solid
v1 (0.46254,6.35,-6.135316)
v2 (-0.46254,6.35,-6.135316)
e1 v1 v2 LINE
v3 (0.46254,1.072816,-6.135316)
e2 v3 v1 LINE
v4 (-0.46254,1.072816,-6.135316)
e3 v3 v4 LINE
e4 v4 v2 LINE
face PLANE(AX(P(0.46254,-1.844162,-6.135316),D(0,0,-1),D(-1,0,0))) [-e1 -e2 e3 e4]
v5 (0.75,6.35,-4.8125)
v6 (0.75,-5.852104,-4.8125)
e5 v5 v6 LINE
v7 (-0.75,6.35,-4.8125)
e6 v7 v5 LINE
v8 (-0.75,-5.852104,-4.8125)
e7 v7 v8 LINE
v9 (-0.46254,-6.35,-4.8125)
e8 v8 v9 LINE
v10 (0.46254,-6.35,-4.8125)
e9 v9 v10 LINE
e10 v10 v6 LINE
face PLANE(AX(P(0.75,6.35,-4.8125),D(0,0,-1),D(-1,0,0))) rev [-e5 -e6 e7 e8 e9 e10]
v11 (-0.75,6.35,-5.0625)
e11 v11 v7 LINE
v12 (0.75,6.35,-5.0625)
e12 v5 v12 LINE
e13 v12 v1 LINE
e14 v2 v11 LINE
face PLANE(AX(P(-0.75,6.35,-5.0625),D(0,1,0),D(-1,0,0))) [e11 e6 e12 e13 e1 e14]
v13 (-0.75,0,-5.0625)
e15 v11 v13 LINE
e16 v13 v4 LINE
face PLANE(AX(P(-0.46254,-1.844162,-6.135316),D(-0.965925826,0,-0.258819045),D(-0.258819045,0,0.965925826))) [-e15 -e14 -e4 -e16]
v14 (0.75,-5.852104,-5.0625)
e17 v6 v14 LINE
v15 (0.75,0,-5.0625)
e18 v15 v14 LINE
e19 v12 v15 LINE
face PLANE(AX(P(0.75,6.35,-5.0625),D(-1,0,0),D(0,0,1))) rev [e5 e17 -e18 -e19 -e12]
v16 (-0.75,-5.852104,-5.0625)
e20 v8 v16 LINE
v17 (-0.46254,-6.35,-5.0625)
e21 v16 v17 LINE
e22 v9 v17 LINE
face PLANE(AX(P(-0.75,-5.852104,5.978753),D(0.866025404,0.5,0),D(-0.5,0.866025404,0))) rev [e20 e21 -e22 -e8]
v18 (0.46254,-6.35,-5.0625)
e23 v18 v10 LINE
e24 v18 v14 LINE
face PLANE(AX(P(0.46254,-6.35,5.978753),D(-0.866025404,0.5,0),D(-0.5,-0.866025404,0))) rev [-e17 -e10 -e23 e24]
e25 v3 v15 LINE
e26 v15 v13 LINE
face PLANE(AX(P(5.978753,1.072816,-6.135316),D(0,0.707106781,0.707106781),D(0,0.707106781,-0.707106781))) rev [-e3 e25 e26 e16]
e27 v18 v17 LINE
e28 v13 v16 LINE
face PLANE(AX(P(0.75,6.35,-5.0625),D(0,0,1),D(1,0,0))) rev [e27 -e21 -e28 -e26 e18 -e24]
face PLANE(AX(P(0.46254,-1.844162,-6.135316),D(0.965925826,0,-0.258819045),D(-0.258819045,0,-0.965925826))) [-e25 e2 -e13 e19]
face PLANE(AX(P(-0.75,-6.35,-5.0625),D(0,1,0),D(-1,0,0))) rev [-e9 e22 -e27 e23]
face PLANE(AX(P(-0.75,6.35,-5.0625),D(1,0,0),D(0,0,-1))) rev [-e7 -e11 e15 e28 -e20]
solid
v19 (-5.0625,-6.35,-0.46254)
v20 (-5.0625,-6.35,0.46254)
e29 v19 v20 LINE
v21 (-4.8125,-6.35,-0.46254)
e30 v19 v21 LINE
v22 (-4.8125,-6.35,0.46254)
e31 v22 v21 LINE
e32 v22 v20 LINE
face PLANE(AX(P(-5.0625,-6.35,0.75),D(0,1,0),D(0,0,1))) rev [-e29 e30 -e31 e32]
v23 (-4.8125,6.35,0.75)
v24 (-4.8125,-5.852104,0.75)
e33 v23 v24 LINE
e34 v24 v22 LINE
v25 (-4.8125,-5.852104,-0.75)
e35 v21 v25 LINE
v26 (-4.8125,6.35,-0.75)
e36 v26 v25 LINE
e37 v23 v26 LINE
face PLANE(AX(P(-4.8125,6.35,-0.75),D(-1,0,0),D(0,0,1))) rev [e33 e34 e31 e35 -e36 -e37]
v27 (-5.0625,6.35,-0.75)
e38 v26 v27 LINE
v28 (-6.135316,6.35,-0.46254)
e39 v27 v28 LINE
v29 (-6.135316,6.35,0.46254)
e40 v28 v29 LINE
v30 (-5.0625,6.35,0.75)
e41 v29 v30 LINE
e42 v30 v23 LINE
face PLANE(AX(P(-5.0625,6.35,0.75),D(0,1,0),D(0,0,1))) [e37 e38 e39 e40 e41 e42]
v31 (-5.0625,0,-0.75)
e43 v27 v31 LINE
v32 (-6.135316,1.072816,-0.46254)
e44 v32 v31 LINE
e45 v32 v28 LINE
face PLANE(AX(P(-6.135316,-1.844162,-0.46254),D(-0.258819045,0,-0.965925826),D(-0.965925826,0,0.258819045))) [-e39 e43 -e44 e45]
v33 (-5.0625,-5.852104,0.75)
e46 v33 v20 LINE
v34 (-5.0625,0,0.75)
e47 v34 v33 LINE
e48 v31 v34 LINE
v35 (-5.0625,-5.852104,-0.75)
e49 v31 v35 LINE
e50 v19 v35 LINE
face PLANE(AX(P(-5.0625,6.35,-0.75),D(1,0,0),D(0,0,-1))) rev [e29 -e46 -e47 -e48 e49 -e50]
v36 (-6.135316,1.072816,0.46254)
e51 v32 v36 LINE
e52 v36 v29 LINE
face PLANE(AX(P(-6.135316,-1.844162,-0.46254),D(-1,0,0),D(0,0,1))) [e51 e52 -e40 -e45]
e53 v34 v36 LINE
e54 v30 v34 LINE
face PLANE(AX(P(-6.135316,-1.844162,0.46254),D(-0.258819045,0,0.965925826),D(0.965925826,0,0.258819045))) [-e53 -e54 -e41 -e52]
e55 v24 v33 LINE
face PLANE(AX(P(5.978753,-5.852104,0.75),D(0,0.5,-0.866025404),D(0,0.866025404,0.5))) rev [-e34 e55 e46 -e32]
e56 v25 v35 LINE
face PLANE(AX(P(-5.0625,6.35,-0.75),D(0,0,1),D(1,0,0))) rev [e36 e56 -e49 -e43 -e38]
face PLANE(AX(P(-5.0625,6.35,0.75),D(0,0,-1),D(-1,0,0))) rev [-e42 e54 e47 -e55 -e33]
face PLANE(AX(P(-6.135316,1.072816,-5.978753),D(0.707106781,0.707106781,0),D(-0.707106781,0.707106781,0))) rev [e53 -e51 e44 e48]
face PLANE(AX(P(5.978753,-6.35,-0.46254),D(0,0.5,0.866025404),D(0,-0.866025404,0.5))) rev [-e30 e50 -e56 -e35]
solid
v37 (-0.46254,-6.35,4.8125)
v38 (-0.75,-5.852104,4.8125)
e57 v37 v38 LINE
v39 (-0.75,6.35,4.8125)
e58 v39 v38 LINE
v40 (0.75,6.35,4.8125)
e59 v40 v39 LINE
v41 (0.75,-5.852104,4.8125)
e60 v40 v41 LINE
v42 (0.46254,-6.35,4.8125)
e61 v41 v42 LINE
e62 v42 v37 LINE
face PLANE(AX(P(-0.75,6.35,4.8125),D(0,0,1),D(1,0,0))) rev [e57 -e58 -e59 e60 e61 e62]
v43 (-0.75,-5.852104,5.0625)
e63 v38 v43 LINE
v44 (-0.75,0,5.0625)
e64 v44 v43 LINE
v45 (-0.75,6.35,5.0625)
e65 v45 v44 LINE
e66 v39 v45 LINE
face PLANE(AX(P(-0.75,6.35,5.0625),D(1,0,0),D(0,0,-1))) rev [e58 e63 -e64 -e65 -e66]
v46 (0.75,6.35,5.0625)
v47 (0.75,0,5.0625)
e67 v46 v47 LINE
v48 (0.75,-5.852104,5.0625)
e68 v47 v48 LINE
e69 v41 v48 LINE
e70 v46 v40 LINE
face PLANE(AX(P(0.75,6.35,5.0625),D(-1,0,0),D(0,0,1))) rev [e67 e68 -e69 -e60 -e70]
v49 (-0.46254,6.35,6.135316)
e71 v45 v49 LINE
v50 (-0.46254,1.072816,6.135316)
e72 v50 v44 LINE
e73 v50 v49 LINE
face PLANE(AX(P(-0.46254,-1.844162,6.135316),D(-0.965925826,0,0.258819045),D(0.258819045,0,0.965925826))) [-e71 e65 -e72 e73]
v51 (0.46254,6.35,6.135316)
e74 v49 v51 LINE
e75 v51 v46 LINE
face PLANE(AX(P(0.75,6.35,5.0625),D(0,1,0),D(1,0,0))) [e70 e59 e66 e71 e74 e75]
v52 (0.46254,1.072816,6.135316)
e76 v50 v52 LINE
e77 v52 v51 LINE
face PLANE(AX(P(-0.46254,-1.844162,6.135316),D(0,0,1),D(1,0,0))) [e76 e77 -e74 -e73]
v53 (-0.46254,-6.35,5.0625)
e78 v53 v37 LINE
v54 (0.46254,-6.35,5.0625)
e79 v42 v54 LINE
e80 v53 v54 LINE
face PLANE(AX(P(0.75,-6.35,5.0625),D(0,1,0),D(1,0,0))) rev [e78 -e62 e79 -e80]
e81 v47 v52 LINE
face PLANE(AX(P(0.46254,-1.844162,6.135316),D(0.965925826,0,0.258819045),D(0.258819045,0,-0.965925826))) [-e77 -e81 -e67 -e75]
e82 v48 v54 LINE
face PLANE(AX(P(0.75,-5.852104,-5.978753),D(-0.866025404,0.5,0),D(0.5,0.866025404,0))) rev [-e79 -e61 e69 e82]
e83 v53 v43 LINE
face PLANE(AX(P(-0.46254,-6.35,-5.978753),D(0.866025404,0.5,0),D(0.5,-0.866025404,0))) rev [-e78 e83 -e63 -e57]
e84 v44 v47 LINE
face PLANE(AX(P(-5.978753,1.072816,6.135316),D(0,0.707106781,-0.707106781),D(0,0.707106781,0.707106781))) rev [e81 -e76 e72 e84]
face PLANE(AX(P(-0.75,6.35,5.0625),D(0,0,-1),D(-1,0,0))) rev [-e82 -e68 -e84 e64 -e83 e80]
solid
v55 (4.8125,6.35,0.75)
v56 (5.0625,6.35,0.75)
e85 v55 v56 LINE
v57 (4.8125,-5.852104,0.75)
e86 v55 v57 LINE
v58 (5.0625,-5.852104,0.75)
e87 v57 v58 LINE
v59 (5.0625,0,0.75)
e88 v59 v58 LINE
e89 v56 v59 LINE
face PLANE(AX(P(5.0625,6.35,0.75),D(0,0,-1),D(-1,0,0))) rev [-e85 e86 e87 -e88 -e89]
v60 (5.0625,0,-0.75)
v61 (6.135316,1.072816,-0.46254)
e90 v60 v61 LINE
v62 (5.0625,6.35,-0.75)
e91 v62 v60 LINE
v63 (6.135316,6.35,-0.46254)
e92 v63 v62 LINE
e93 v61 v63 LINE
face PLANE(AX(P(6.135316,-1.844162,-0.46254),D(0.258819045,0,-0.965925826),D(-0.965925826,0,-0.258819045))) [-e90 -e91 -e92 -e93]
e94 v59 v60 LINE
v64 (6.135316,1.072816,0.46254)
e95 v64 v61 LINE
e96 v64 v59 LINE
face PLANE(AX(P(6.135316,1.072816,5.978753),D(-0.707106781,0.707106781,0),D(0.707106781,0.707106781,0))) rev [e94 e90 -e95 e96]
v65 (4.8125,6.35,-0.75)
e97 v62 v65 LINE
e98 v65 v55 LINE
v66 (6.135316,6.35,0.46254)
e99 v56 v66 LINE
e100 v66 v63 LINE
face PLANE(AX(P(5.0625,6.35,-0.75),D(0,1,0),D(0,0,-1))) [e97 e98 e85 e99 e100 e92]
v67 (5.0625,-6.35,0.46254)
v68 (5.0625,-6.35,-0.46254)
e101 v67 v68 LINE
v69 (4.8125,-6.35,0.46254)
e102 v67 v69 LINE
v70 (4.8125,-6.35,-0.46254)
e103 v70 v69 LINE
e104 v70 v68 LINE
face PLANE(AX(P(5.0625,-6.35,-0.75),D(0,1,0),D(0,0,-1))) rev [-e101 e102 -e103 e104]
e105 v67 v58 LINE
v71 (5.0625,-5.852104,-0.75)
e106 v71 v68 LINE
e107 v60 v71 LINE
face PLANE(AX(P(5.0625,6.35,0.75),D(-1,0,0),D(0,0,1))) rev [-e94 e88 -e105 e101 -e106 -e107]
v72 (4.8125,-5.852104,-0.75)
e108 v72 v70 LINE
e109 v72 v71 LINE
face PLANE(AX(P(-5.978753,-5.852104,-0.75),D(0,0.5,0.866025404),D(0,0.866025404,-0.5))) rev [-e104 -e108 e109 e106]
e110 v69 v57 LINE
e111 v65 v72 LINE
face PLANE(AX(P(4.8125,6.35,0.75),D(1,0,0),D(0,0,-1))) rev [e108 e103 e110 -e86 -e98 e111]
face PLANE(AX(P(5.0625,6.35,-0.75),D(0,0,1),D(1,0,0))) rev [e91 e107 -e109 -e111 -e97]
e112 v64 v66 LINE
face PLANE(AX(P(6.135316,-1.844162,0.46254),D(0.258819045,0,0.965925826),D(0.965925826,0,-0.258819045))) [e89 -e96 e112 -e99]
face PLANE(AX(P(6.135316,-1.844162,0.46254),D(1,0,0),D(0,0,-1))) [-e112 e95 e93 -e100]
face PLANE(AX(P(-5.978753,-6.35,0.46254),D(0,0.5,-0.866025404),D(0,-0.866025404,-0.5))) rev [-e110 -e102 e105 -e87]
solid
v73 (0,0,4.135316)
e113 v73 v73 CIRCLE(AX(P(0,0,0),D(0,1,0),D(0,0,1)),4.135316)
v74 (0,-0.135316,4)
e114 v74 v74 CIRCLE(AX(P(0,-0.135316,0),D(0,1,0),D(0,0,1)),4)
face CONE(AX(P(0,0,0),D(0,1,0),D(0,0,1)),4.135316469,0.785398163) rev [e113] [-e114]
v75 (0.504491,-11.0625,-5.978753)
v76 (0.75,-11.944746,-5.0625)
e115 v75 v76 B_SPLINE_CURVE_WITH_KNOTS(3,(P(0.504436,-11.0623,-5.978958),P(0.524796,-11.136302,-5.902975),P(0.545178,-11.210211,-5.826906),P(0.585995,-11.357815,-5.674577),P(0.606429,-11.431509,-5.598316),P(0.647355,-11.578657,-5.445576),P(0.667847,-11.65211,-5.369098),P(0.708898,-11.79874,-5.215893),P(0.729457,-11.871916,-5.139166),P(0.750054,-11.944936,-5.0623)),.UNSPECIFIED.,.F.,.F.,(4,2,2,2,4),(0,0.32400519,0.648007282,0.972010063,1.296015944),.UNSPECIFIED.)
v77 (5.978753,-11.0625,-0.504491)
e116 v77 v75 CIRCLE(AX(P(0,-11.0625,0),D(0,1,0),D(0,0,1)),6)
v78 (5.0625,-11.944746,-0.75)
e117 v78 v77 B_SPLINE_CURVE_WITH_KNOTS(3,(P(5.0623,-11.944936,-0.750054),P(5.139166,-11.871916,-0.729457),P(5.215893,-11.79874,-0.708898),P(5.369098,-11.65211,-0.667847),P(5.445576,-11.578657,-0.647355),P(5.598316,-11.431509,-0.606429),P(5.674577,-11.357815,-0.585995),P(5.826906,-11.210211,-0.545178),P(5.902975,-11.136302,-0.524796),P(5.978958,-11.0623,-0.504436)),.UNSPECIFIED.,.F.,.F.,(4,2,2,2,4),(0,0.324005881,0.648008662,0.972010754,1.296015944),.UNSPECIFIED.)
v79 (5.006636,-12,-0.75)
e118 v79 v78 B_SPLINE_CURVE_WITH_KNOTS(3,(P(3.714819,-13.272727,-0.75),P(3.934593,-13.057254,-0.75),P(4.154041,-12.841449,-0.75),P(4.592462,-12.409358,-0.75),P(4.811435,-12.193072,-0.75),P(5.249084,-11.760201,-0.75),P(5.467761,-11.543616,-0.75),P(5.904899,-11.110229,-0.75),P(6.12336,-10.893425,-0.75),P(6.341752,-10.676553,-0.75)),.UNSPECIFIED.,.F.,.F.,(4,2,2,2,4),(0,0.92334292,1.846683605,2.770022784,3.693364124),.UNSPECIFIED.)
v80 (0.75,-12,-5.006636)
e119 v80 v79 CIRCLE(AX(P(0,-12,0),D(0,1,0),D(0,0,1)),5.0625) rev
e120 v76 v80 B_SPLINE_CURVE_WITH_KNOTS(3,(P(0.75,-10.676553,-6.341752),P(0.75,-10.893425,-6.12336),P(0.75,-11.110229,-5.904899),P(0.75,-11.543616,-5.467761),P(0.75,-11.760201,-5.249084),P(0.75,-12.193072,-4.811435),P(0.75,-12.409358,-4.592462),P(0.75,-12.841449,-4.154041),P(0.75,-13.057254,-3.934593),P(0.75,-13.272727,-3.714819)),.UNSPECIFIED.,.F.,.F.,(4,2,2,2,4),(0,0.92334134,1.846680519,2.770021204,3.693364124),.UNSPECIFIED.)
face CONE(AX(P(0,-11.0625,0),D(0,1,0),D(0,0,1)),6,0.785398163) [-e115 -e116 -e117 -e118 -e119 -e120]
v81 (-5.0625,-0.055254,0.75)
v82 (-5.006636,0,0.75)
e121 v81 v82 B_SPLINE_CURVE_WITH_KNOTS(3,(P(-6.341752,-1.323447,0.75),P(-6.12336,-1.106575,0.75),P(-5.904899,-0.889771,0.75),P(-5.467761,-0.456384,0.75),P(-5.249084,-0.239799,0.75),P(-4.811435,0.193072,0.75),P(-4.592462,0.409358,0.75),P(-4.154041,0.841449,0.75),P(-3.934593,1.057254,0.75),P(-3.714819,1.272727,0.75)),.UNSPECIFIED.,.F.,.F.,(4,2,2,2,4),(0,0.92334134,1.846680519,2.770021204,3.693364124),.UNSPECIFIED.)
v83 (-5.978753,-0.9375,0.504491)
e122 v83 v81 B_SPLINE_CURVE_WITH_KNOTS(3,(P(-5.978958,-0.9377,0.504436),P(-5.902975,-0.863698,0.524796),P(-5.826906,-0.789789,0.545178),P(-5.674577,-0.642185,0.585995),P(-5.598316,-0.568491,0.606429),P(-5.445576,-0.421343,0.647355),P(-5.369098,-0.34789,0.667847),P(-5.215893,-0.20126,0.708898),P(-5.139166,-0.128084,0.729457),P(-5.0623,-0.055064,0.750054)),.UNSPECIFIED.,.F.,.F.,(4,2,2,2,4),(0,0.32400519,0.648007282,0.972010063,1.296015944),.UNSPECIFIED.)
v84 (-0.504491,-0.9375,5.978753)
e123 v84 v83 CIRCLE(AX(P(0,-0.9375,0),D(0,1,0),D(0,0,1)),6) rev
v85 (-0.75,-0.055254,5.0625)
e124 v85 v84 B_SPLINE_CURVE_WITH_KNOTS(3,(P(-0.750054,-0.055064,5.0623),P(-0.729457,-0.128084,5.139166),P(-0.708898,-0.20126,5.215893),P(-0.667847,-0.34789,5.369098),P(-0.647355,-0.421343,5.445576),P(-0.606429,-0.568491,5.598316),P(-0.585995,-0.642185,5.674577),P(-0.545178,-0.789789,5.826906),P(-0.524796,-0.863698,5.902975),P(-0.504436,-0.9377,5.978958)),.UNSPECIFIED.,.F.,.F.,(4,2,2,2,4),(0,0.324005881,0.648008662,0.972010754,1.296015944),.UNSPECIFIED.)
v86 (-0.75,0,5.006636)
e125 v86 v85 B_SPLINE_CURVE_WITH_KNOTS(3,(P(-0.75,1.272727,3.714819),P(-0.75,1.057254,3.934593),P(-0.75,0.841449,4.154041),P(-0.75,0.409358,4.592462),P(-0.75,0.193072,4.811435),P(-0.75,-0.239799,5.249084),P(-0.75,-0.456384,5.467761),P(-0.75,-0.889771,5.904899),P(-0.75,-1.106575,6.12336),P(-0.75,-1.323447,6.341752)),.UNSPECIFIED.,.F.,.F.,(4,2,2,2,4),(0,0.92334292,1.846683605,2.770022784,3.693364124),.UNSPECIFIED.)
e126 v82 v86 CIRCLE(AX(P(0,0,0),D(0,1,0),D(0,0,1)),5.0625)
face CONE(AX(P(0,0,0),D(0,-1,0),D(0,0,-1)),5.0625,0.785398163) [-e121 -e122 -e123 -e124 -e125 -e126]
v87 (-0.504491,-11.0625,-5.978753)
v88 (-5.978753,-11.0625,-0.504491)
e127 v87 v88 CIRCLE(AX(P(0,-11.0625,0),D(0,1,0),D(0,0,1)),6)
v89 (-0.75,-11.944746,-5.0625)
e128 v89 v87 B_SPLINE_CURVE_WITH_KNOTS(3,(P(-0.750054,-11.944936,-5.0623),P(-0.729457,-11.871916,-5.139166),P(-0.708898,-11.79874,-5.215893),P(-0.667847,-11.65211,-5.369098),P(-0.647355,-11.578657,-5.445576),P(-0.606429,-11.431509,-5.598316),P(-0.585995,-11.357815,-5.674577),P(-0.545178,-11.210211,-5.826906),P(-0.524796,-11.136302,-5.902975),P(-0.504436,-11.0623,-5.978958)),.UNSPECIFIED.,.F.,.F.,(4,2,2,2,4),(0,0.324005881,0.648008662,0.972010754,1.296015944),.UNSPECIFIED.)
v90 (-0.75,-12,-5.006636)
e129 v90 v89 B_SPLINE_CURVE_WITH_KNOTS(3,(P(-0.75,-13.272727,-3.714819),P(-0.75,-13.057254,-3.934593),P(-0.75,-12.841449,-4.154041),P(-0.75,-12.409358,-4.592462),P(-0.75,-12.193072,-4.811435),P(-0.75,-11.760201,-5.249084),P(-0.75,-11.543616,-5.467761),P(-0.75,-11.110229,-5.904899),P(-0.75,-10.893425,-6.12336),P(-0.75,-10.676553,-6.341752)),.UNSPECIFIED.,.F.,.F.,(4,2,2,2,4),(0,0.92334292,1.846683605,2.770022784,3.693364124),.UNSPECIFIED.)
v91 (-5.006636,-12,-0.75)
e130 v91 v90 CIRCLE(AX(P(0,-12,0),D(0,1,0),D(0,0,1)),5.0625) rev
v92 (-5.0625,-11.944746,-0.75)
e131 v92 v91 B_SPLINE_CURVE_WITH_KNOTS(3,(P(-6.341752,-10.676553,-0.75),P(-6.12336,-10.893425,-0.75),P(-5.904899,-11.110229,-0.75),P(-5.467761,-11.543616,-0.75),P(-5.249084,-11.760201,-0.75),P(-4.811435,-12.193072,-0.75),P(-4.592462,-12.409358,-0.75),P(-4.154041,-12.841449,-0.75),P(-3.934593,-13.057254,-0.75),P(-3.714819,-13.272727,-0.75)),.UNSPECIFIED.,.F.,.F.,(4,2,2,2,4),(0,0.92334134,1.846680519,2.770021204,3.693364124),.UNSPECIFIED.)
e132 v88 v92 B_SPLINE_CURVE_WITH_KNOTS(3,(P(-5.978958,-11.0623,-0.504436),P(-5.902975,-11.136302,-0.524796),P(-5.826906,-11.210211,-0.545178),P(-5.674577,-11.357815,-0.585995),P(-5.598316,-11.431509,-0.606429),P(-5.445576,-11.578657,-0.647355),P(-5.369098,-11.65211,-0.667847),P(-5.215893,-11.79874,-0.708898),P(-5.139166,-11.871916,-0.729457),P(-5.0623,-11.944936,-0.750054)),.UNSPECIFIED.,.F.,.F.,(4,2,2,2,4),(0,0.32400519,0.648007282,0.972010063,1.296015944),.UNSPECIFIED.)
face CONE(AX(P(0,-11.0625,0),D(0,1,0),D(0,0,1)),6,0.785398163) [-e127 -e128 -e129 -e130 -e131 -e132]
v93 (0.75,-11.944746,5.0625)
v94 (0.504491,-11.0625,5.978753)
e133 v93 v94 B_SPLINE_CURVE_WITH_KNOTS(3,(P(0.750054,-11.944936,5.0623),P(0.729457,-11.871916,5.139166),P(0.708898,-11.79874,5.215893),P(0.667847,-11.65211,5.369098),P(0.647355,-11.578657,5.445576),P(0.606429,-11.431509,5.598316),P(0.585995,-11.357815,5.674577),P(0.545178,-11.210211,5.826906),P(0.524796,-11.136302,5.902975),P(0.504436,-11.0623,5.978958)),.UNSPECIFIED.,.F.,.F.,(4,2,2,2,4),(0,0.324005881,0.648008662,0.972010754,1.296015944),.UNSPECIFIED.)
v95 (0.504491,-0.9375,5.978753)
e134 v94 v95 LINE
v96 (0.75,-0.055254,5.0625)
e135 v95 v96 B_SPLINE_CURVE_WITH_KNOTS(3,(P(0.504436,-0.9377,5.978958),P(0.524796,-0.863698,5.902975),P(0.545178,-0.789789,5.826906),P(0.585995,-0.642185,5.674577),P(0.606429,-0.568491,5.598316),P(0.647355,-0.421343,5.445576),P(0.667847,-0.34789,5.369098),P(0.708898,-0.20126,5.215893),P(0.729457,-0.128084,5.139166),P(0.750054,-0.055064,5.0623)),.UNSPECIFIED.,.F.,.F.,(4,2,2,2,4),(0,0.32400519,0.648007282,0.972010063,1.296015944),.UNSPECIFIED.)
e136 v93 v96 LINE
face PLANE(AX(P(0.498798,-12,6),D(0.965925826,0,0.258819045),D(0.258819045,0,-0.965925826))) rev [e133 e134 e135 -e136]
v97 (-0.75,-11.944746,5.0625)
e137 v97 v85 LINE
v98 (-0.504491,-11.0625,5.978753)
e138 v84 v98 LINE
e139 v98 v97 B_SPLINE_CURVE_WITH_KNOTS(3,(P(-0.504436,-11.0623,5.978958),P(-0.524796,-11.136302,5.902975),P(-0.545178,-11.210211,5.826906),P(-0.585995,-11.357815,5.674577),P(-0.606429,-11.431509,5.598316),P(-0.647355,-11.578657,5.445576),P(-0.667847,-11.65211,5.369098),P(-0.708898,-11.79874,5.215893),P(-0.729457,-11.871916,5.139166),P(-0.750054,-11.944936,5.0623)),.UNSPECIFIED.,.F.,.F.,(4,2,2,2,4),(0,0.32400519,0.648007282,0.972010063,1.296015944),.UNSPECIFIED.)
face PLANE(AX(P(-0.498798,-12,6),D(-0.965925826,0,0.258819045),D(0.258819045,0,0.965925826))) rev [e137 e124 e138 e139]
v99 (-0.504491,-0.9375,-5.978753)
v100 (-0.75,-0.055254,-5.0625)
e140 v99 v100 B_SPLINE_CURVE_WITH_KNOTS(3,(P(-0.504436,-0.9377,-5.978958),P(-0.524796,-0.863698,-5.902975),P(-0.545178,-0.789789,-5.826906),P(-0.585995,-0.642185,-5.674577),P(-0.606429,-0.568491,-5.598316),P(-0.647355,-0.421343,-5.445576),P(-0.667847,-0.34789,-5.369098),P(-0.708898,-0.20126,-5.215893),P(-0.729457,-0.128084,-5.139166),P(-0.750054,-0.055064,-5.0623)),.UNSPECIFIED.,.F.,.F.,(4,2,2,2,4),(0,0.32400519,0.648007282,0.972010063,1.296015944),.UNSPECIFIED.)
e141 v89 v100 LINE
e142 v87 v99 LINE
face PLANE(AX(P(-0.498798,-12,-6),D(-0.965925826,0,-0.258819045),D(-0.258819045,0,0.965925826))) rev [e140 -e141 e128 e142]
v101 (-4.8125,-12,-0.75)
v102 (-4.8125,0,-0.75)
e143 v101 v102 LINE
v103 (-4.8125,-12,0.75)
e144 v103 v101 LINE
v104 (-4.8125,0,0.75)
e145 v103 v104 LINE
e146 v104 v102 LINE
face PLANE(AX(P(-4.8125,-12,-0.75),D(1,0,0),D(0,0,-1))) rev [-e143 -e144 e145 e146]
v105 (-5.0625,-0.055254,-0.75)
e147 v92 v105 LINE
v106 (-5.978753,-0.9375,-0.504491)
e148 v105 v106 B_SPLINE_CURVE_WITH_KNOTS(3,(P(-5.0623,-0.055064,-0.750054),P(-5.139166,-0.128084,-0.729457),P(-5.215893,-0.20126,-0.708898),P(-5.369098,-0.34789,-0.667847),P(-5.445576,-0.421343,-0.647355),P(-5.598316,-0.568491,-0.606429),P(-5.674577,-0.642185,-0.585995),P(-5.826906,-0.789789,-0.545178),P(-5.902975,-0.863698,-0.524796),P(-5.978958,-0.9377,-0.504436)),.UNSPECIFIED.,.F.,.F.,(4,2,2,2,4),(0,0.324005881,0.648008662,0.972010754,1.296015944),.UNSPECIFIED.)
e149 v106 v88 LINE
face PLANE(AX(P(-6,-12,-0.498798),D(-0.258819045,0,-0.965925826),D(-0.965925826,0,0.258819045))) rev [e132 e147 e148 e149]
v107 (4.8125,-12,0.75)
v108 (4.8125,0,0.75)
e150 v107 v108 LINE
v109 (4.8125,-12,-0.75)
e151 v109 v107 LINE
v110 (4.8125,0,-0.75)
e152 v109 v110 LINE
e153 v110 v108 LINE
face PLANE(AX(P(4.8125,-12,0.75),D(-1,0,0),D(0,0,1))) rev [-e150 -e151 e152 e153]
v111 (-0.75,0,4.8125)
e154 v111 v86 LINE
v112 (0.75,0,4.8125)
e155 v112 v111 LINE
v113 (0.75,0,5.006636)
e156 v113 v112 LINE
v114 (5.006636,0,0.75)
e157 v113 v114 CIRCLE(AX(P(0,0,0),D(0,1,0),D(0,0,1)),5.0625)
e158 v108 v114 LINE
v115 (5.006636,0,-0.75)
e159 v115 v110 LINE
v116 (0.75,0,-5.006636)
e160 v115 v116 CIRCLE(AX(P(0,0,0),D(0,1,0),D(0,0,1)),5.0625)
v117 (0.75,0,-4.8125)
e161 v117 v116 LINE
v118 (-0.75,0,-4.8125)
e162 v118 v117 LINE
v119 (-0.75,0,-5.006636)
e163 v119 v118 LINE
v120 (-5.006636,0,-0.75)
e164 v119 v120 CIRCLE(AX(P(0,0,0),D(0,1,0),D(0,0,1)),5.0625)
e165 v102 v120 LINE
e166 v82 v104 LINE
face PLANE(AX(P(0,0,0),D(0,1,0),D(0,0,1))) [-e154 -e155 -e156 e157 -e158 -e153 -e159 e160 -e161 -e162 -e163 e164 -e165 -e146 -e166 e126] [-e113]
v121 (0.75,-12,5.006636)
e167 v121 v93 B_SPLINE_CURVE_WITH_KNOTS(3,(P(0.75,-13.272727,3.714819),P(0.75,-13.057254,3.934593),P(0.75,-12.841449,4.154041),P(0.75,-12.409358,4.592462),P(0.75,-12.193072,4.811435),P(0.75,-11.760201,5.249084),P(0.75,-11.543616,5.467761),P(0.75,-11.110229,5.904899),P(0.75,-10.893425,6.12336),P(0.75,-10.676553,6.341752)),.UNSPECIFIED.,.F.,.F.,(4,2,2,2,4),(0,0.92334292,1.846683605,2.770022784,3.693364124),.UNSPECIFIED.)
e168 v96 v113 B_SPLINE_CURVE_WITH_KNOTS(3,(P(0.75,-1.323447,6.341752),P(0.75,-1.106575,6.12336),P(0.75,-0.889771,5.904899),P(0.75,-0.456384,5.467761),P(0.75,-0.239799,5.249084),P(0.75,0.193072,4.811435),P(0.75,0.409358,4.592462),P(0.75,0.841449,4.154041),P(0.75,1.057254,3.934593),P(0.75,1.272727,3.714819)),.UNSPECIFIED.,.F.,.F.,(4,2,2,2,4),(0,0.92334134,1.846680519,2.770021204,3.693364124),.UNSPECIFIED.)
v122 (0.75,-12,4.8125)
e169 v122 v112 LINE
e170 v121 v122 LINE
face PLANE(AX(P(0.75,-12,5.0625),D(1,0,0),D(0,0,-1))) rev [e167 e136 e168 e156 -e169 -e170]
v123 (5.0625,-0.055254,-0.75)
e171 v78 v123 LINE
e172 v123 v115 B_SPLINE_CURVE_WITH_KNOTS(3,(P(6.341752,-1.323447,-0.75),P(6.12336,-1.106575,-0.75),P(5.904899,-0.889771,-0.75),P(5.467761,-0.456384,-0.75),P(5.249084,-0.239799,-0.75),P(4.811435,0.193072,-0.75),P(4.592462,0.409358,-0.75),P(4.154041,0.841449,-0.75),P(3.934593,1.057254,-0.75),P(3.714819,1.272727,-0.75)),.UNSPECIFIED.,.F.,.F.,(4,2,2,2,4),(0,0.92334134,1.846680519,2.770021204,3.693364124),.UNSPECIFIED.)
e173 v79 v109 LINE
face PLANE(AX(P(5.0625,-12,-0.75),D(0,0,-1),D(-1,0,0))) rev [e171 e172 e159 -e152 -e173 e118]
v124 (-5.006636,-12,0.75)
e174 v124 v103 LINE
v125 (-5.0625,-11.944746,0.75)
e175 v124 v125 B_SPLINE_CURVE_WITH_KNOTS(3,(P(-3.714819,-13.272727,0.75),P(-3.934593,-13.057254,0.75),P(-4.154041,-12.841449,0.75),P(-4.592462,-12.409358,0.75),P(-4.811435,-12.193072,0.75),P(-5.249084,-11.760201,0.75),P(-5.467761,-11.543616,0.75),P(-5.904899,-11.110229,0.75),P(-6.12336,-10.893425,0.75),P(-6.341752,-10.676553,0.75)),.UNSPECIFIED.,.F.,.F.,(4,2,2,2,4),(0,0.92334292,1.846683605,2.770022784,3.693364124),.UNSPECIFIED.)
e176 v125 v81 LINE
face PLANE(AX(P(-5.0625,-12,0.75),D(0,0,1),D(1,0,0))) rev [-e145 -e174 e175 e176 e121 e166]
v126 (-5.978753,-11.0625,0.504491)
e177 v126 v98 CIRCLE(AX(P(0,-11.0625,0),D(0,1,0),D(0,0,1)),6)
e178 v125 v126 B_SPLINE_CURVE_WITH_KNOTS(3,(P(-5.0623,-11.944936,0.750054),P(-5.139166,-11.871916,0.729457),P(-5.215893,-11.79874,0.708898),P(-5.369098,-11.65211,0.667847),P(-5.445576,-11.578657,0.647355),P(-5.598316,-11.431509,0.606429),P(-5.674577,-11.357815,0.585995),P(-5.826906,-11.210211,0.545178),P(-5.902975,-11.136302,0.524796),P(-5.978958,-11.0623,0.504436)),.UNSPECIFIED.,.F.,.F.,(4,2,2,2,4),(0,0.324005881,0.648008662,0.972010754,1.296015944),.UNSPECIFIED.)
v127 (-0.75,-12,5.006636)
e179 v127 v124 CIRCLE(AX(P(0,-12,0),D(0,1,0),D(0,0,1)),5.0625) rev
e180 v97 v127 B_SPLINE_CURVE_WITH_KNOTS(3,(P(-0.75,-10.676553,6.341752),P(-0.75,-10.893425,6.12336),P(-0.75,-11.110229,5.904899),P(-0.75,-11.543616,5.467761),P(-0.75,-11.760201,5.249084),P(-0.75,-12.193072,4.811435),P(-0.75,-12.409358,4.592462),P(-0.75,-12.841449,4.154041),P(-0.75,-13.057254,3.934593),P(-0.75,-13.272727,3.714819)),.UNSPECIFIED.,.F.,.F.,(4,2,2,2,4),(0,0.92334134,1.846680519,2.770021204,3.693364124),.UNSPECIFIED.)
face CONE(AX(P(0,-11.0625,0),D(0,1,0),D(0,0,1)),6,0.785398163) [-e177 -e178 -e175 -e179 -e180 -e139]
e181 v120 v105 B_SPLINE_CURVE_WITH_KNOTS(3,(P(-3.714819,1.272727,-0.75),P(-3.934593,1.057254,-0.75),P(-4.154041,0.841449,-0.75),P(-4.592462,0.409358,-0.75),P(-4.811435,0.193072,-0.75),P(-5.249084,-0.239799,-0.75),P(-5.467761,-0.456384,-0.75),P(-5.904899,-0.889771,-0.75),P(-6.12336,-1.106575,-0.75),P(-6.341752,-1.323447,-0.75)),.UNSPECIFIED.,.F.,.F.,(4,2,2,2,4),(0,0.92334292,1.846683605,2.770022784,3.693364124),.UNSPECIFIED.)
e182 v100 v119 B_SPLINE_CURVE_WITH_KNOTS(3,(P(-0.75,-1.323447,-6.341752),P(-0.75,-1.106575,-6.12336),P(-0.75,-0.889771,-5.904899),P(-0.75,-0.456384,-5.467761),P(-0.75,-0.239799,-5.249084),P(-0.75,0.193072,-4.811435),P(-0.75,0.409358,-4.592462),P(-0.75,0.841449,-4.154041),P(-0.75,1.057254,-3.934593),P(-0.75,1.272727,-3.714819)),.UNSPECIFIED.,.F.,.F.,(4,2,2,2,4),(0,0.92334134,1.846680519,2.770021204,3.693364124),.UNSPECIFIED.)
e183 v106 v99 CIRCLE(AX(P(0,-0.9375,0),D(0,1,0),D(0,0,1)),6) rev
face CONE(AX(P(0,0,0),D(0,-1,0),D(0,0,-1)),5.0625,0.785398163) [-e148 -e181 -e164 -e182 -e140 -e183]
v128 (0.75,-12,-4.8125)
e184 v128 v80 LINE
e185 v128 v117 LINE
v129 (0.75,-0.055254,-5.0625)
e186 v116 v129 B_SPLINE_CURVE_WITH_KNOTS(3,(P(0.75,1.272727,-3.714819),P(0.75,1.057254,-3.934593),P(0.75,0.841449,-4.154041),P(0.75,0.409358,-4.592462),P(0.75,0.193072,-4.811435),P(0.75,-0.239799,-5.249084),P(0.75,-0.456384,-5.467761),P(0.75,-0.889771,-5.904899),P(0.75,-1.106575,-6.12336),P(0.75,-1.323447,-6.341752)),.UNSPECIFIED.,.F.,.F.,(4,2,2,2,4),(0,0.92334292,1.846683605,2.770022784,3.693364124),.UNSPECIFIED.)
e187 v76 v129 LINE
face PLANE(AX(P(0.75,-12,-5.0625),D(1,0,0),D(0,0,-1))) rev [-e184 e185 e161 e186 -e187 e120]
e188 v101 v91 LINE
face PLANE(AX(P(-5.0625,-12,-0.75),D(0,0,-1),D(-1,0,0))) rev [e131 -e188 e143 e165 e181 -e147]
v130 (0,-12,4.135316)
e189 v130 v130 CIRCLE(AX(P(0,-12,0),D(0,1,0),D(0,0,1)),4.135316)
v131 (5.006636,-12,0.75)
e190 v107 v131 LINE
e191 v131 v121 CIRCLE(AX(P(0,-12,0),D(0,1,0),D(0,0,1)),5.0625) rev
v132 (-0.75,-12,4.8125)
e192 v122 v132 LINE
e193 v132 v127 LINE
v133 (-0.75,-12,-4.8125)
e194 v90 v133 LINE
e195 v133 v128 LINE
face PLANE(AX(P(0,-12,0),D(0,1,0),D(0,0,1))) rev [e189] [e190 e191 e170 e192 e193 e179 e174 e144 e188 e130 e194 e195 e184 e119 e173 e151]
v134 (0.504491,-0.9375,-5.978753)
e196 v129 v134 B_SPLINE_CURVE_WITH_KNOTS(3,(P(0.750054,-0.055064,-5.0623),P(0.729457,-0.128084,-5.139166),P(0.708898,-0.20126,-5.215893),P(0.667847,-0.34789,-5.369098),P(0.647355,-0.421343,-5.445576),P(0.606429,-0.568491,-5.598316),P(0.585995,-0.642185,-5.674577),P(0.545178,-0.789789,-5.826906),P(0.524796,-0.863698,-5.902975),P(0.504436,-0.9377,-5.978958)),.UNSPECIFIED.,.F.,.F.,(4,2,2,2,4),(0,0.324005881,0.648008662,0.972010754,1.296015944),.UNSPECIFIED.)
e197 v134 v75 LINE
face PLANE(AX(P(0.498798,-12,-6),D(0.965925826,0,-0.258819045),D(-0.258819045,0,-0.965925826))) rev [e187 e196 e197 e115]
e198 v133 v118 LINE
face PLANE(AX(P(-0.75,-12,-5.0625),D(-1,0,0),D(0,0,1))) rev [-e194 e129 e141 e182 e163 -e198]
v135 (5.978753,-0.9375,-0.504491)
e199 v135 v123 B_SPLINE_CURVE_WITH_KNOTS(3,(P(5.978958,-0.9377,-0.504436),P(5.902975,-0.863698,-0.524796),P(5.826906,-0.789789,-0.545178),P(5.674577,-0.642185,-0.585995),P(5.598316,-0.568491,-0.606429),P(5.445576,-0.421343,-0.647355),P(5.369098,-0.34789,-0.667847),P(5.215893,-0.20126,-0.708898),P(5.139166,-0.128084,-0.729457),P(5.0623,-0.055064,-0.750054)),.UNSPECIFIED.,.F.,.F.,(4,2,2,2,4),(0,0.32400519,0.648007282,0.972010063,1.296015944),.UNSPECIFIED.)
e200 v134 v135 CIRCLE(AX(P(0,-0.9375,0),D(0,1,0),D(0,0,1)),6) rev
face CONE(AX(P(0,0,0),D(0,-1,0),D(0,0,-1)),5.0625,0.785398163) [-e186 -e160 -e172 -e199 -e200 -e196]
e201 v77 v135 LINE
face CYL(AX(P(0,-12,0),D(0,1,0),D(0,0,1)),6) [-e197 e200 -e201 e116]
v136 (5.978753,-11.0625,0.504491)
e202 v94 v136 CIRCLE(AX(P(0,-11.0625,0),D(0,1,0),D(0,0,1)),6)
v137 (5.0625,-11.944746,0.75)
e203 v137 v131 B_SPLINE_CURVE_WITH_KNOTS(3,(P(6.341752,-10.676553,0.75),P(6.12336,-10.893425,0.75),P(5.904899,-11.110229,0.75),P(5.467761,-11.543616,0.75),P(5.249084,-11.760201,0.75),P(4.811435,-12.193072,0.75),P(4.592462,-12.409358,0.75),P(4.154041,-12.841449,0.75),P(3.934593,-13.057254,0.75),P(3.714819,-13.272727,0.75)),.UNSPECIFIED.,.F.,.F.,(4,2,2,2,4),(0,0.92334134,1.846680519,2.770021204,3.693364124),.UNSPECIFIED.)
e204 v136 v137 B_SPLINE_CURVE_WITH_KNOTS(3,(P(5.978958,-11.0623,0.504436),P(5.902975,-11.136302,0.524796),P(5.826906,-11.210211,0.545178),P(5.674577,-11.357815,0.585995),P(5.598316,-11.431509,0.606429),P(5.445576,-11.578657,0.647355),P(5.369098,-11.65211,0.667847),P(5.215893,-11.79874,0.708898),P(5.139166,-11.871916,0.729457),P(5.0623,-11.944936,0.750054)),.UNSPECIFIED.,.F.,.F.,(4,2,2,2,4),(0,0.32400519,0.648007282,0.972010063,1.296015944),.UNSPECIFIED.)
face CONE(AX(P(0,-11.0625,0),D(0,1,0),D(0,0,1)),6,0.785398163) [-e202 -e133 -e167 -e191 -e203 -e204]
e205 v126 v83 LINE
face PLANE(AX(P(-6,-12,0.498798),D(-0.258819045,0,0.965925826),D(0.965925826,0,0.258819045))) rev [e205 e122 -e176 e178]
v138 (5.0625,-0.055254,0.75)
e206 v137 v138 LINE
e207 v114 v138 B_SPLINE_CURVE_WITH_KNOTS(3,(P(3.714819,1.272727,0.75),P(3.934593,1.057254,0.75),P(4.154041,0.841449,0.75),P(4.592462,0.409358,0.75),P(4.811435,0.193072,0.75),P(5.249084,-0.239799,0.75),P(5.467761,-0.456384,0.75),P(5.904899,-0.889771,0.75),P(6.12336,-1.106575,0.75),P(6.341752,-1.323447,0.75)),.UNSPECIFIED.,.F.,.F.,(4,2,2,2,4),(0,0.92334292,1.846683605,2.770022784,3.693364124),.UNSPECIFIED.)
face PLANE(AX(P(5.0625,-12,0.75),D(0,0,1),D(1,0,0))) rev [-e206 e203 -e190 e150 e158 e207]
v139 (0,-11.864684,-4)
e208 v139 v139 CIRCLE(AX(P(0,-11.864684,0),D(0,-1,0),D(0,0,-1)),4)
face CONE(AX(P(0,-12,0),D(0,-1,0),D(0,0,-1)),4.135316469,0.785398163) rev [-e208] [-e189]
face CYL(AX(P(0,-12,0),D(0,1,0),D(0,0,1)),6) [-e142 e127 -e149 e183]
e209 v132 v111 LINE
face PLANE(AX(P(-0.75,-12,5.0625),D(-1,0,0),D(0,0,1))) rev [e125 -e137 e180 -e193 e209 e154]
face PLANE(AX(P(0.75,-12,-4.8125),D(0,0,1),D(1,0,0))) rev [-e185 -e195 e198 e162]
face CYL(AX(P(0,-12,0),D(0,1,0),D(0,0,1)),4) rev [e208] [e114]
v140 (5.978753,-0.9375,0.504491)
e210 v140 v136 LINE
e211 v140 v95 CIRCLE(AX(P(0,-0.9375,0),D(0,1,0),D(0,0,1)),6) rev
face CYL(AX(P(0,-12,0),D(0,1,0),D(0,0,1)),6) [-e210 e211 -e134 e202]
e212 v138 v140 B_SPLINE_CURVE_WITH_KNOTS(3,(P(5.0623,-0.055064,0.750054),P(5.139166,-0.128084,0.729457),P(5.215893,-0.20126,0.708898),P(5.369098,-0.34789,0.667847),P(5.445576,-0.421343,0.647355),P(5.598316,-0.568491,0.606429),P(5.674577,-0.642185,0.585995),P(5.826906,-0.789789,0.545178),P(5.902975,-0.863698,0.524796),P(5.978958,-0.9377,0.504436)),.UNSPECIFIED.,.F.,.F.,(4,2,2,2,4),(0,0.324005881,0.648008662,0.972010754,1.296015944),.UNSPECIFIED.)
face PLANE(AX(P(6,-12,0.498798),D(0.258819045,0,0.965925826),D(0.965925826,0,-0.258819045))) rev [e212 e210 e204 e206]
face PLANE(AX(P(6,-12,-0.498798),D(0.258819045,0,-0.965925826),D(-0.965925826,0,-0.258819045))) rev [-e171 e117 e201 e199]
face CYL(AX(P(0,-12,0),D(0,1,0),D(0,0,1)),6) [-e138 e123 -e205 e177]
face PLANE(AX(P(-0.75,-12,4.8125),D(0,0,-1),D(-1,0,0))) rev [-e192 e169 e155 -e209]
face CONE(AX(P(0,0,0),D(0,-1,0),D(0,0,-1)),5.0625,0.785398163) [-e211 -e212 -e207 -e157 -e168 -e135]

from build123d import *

# Parameters (mm, degrees)
SKETCH3_R           = 6
EXTRUDE1_DEPTH      = 12
CHAMFER1_SIZE       = 0.9375
EXTRUDE2_DEPTH      = 15.696938457
CIRPATTERN1_COUNT   = 4
SKETCH6_R           = 4
EXTRUDE3_DEPTH      = 15.679610971
SKETCH12_W          = 0.25
SKETCH12_H          = 1.5
EXTRUDE6_DEPTH      = 6.35
EXTRUDE7_DEPTH      = 6.35
EXTRUDE8_DEPTH      = 15.744069903
EXTRUDE8_DEPTH_BACK = 15.744069903
EXTRUDE9_DEPTH      = 18.368211193
CIRPATTERN2_COUNT   = 4


# Read off the part's stored shape, not the designer's step: Extrude4, Extrude5
with BuildPart() as part:
    # Sketch3 → Extrude1 (new body)
    with BuildSketch(Plane(origin=(0, 0, 0), x_dir=(1, 0, 0), z_dir=(0, 1, 0))):
        with Locations(Location((0, 0, 0), (0, 0, 270))):
            Circle(SKETCH3_R)
    extrude(amount=-EXTRUDE1_DEPTH)

    # Chamfer1
    chamfer1_edges = [part.edges().sort_by_distance(p)[0] for p in [
        (0, 0, -6),
        (0, -12, -6),
    ]]
    chamfer(chamfer1_edges, length=CHAMFER1_SIZE)

    # Sketch11 → Extrude2 (cut, through all)
    with BuildSketch(Plane(origin=(0, 0, 0), x_dir=(1, 0, 0), z_dir=(0, 1, 0))):
        Polygon((-6, 0.498797632), (-5.0625, 0.75), (-4.8125, 0.75), (-4.8125, -0.75), (-5.0625, -0.75), (-6, -0.498797632), align=None)
    extrude2 = extrude(amount=-EXTRUDE2_DEPTH, mode=Mode.SUBTRACT)

    # CirPattern1: Extrude2 ×4 about axis
    cirpattern1_axis = Axis((0, 0, 0), (0, 1, 0))
    for i in range(1, CIRPATTERN1_COUNT):
        add(extrude2.rotate(cirpattern1_axis, i * 360 / CIRPATTERN1_COUNT), mode=Mode.SUBTRACT)

    # Sketch6 → Extrude3 (cut, through all)
    with BuildSketch(Plane(origin=(0, 0, 0), x_dir=(1, 0, 0), z_dir=(0, 1, 0))):
        with Locations(Location((0, 0, 0), (0, 0, 270))):
            Circle(SKETCH6_R)
    extrude(amount=-EXTRUDE3_DEPTH, mode=Mode.SUBTRACT)

    # Extrude4 outline → Extrude4 (revolve, cut)
    with BuildSketch(Plane.XY):
        Polygon((4, 0), (4, -0.135316469), (4.135316469, 0), align=None)
    revolve(axis=Axis((0, 0, 0), (0, 1, 0)), mode=Mode.SUBTRACT)

    # Extrude5 outline → Extrude5 (revolve, cut)
    with BuildSketch(Plane.XY):
        Polygon((4.135316469, -12), (4, -11.864683531), (4, -12), align=None)
    revolve(axis=Axis((0, 0, 0), (0, 1, 0)), mode=Mode.SUBTRACT)


with BuildPart() as body_2:
    # Sketch12 → Extrude6 (new, symmetric)
    with BuildSketch(Plane(origin=(0, 0, 0), x_dir=(1, 0, 0), z_dir=(0, 1, 0))):
        with Locations((-4.9375, 0)):
            Rectangle(SKETCH12_W, SKETCH12_H)
    extrude(amount=EXTRUDE6_DEPTH, both=True)

    # Sketch13 → Extrude7 (add)
    with BuildSketch(Plane(origin=(0, 6.35, 0), x_dir=(1, 0, 0), z_dir=(0, 1, 0))):
        Polygon((-6.135316469, 0.462539693), (-5.0625, 0.75), (-5.0625, -0.75), (-6.135316469, -0.462539693), align=None)
    extrude(amount=-EXTRUDE7_DEPTH)

    # Sketch14 → Extrude8 (cut, two sides: drawn at the far end of the back side and taken through both)
    with BuildSketch(Plane.XY.offset(-EXTRUDE8_DEPTH_BACK)):
        Polygon((-6.135316469, 0), (-6.135316469, 1.072816469), (-5.0625, 0), align=None)
    extrude(amount=EXTRUDE8_DEPTH + EXTRUDE8_DEPTH_BACK, mode=Mode.SUBTRACT)

    # Sketch15 → Extrude9 (cut, through all)
    with BuildSketch(Plane.ZY.offset(5.0625)):
        Polygon((-0.462539693, -6.35), (-0.75, -5.852104144), (-0.75, -6.35), align=None)
        Polygon((0.462539693, -6.35), (0.75, -6.35), (0.75, -5.852104144), align=None)
    extrude(amount=-EXTRUDE9_DEPTH, mode=Mode.SUBTRACT)


with BuildPart() as cirpattern2_1:
    # CirPattern2: pattern copy
    add(body_2.part.rotate(Axis((0, 0, 0), (0, 1, 0)), 1 * 360 / CIRPATTERN2_COUNT))


with BuildPart() as cirpattern2_2:
    # CirPattern2: pattern copy
    add(body_2.part.rotate(Axis((0, 0, 0), (0, 1, 0)), 2 * 360 / CIRPATTERN2_COUNT))


with BuildPart() as cirpattern2_3:
    # CirPattern2: pattern copy
    add(body_2.part.rotate(Axis((0, 0, 0), (0, 1, 0)), 3 * 360 / CIRPATTERN2_COUNT))


solid = Compound([part.part, body_2.part, cirpattern2_1.part, cirpattern2_2.part, cirpattern2_3.part])
